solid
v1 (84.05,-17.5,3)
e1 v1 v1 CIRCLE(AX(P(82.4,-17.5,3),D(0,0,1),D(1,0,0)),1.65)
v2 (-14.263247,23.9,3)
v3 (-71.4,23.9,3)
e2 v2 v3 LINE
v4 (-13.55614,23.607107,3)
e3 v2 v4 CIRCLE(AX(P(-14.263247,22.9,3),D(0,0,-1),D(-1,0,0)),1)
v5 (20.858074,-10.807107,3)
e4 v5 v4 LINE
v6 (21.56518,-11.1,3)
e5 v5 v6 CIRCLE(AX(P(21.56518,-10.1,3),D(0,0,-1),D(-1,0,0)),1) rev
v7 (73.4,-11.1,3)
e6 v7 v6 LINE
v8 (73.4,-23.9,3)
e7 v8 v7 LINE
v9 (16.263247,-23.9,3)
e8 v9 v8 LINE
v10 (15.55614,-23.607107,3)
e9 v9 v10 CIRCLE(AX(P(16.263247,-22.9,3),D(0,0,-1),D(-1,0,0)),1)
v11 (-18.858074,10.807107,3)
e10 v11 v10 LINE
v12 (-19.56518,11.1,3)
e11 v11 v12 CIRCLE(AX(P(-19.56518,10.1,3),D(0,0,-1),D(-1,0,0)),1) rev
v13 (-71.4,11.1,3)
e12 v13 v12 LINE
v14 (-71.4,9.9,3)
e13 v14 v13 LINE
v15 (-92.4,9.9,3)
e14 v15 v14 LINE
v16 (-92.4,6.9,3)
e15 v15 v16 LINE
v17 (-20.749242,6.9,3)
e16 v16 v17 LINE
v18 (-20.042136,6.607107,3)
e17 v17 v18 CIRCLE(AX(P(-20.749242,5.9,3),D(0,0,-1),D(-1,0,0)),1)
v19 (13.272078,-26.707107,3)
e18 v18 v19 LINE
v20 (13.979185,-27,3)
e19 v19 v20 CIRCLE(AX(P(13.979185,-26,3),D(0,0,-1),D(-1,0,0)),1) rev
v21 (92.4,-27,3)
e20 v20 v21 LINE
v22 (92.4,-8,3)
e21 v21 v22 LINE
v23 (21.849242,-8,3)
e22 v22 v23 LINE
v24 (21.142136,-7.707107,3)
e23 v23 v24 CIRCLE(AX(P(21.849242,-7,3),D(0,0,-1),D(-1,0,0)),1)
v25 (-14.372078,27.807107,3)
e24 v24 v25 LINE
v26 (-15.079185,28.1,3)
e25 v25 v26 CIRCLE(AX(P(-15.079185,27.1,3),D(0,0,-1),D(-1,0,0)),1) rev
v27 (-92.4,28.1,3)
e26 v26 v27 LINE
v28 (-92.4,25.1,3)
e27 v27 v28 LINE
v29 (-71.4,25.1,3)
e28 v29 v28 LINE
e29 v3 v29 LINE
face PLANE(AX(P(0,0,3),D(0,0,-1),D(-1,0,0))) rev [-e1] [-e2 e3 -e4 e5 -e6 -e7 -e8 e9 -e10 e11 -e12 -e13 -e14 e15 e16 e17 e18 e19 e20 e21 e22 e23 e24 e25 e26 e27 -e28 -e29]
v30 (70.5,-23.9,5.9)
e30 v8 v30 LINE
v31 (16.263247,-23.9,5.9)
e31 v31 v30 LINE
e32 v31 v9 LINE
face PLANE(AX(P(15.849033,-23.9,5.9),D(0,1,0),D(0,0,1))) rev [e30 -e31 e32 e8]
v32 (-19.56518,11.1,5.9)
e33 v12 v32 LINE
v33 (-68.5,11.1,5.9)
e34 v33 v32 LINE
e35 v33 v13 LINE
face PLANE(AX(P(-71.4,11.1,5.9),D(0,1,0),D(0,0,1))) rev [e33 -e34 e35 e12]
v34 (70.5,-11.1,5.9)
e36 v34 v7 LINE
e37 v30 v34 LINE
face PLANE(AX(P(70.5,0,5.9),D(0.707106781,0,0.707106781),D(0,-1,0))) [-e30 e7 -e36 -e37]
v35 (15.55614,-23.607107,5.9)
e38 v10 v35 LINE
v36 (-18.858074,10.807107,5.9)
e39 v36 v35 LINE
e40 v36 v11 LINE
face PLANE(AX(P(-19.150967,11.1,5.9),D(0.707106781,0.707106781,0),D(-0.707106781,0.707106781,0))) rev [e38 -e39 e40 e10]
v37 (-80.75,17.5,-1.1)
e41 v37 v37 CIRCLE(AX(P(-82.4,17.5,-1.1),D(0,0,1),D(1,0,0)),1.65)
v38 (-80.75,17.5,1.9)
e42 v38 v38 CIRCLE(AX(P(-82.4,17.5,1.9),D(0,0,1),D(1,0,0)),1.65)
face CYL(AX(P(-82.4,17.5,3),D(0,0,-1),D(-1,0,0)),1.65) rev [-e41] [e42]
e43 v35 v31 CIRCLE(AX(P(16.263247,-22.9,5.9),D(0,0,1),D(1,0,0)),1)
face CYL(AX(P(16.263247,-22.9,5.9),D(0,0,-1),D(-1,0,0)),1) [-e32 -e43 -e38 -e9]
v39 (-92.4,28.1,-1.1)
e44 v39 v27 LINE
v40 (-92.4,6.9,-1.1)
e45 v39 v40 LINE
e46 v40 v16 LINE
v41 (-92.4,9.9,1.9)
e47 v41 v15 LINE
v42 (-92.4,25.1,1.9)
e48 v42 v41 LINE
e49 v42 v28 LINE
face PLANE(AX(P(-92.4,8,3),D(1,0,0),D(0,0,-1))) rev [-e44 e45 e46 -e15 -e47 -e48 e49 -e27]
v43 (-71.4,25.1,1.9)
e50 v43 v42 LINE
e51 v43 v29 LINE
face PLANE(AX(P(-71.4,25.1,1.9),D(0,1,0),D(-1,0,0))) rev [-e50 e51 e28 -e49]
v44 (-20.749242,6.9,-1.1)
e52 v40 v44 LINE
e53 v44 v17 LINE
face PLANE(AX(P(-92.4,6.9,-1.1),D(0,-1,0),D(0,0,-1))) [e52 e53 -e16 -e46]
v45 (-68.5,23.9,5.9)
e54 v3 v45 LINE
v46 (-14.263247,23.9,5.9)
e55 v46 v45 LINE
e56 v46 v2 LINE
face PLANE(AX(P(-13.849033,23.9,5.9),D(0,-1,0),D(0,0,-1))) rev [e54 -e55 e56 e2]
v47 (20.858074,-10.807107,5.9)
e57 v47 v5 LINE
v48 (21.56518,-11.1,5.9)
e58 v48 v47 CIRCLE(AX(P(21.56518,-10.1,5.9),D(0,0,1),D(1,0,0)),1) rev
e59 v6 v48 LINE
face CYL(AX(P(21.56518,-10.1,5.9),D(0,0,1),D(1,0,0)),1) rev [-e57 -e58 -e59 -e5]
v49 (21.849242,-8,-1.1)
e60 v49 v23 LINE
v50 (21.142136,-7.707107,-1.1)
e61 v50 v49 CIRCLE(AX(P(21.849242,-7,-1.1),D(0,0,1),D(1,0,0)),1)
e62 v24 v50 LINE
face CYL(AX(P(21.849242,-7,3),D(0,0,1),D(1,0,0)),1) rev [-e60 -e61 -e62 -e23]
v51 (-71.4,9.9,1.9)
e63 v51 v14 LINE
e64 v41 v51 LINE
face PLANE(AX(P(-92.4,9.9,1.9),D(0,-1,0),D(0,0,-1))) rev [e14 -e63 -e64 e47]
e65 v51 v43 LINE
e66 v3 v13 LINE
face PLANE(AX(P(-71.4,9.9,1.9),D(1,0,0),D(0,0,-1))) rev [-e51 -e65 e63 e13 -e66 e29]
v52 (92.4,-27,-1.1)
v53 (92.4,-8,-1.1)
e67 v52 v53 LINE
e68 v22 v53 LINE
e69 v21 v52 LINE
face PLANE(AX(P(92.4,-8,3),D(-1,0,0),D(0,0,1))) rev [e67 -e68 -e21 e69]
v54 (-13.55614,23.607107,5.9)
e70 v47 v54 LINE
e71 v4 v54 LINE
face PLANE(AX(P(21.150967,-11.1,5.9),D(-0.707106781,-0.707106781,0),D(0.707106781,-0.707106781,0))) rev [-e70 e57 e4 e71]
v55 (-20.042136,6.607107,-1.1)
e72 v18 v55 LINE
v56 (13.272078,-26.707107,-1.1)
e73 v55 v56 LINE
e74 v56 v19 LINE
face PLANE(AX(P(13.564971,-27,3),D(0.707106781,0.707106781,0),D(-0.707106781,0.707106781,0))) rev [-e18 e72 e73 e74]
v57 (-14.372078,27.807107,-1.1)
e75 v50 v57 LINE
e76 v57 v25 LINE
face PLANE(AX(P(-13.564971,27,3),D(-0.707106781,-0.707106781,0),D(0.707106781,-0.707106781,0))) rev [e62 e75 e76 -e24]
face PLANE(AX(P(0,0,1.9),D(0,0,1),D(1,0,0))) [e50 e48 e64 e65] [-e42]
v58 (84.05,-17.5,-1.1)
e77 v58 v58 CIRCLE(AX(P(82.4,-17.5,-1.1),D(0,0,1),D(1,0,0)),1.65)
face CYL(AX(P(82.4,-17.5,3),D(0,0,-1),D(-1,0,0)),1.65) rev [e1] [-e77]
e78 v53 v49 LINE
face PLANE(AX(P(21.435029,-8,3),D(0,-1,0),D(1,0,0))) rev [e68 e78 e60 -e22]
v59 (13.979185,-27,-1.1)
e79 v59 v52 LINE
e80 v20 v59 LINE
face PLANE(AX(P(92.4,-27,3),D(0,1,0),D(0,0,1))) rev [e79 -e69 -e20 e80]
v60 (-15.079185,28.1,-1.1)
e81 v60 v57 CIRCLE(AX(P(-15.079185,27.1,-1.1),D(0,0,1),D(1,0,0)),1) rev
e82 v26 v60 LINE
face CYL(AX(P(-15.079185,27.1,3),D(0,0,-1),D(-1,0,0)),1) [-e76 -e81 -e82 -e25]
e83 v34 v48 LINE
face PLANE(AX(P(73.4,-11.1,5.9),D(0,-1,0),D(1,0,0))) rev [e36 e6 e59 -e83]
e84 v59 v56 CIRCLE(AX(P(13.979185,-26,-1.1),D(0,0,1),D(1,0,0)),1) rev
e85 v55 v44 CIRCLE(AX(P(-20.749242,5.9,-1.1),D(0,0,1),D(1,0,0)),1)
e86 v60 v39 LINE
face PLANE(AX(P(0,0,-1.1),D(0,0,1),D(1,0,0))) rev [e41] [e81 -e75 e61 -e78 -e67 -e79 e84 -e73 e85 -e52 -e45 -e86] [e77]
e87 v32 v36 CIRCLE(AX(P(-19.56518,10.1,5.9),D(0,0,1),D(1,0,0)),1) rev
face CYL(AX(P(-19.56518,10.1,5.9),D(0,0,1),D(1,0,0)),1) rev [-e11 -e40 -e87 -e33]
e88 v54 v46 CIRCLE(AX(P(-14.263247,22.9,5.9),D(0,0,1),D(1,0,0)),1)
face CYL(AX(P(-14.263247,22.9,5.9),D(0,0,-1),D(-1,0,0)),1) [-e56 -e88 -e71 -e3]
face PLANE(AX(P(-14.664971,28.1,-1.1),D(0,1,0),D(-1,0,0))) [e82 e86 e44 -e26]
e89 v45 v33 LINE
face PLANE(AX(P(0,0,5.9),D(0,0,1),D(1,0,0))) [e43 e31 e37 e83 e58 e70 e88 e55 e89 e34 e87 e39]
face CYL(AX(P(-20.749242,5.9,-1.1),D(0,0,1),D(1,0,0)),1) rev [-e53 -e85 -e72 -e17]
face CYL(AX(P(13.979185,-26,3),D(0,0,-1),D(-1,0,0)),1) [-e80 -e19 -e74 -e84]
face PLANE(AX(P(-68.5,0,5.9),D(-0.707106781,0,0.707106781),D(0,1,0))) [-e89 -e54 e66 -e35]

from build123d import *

# Parameters (mm, degrees)
SKETCH_1_R          = 1.65
EXTRUDE_1_DEPTH     = 3
EXTRUDE_2_DEPTH     = 2.9
CHAMFER_1_SIZE      = 2.9
EXTRUDE_START       = -1.1
SKETCH_6_R          = 1.65
EXTRUDE_3_DEPTH     = 4.1
CUT_EXTRUDE_START   = 3
SKETCH_7_W          = 21
SKETCH_7_H          = 15.2
CUT_EXTRUDE_1_DEPTH = 1.1
FILLET_1_R          = 1


with BuildPart() as part:
    # 草图1 → 凸台-拉伸1 (new body)
    with BuildSketch(Plane.XY):
        Polygon((-92.4, 27), (-13.564971157, 27), (21.435028843, -8), (92.4, -8), (92.4, -27), (13.564971157, -27), (-21.435028843, 8), (-92.4, 8), align=None)
        with Locations((-82.4, 17.5)):
            Circle(SKETCH_1_R, mode=Mode.SUBTRACT)
        with Locations((82.4, -17.5)):
            Circle(SKETCH_1_R, mode=Mode.SUBTRACT)
    extrude(amount=EXTRUDE_1_DEPTH)

    # 草图2 → 凸台-拉伸2 (add)
    with BuildSketch(Plane.XY.offset(3)):
        Polygon((-71.4, 23.9), (-71.4, 11.1), (-19.150966799, 11.1), (15.849033201, -23.9), (73.4, -23.9), (73.4, -11.1), (21.150966799, -11.1), (-13.849033201, 23.9), align=None)
    extrude(amount=EXTRUDE_2_DEPTH)

    # 倒角1
    chamfer_1_edges = [part.edges().sort_by_distance(p)[0] for p in [
        (73.4, -17.5, 5.9),
        (-71.4, 17.5, 5.9),
    ]]
    chamfer(chamfer_1_edges, length=CHAMFER_1_SIZE - 0.0001)  # a hair under: the kernel refuses the full size

    # 草图6 → 凸台-拉伸3 (add)
    with BuildSketch(Plane.XY.offset(EXTRUDE_START)):
        Polygon((-92.4, 28.1), (-92.4, 6.9), (-20.335028843, 6.9), (13.564971157, -27), (92.4, -27), (92.4, -8), (21.435028843, -8), (-14.664971157, 28.1), align=None)
        with Locations((-82.4, 17.5)):
            Circle(SKETCH_6_R, mode=Mode.SUBTRACT)
        with Locations((82.4, -17.5)):
            Circle(SKETCH_6_R, mode=Mode.SUBTRACT)
    extrude(amount=EXTRUDE_3_DEPTH)

    # 草图7 → 切除-拉伸1 (cut)
    with BuildSketch(Plane.XY.offset(CUT_EXTRUDE_START)):
        with Locations((-81.9, 17.5)):
            Rectangle(SKETCH_7_W, SKETCH_7_H)
    extrude(amount=-CUT_EXTRUDE_1_DEPTH, mode=Mode.SUBTRACT)

    # 圆角1
    fillet_1_edges = [part.edges().sort_by_distance(p)[0] for p in [
        (21.435028843, -8, 0.95),
        (13.564971157, -27, 0.95),
        (-13.849033201, 23.9, 4.45),
        (-19.150966799, 11.1, 4.45),
        (15.849033201, -23.9, 4.45),
        (21.150966799, -11.1, 4.45),
        (-14.664971157, 28.1, 0.95),
        (-20.335028843, 6.9, 0.95),
    ]]
    fillet(fillet_1_edges, radius=FILLET_1_R)


solid = part.part
